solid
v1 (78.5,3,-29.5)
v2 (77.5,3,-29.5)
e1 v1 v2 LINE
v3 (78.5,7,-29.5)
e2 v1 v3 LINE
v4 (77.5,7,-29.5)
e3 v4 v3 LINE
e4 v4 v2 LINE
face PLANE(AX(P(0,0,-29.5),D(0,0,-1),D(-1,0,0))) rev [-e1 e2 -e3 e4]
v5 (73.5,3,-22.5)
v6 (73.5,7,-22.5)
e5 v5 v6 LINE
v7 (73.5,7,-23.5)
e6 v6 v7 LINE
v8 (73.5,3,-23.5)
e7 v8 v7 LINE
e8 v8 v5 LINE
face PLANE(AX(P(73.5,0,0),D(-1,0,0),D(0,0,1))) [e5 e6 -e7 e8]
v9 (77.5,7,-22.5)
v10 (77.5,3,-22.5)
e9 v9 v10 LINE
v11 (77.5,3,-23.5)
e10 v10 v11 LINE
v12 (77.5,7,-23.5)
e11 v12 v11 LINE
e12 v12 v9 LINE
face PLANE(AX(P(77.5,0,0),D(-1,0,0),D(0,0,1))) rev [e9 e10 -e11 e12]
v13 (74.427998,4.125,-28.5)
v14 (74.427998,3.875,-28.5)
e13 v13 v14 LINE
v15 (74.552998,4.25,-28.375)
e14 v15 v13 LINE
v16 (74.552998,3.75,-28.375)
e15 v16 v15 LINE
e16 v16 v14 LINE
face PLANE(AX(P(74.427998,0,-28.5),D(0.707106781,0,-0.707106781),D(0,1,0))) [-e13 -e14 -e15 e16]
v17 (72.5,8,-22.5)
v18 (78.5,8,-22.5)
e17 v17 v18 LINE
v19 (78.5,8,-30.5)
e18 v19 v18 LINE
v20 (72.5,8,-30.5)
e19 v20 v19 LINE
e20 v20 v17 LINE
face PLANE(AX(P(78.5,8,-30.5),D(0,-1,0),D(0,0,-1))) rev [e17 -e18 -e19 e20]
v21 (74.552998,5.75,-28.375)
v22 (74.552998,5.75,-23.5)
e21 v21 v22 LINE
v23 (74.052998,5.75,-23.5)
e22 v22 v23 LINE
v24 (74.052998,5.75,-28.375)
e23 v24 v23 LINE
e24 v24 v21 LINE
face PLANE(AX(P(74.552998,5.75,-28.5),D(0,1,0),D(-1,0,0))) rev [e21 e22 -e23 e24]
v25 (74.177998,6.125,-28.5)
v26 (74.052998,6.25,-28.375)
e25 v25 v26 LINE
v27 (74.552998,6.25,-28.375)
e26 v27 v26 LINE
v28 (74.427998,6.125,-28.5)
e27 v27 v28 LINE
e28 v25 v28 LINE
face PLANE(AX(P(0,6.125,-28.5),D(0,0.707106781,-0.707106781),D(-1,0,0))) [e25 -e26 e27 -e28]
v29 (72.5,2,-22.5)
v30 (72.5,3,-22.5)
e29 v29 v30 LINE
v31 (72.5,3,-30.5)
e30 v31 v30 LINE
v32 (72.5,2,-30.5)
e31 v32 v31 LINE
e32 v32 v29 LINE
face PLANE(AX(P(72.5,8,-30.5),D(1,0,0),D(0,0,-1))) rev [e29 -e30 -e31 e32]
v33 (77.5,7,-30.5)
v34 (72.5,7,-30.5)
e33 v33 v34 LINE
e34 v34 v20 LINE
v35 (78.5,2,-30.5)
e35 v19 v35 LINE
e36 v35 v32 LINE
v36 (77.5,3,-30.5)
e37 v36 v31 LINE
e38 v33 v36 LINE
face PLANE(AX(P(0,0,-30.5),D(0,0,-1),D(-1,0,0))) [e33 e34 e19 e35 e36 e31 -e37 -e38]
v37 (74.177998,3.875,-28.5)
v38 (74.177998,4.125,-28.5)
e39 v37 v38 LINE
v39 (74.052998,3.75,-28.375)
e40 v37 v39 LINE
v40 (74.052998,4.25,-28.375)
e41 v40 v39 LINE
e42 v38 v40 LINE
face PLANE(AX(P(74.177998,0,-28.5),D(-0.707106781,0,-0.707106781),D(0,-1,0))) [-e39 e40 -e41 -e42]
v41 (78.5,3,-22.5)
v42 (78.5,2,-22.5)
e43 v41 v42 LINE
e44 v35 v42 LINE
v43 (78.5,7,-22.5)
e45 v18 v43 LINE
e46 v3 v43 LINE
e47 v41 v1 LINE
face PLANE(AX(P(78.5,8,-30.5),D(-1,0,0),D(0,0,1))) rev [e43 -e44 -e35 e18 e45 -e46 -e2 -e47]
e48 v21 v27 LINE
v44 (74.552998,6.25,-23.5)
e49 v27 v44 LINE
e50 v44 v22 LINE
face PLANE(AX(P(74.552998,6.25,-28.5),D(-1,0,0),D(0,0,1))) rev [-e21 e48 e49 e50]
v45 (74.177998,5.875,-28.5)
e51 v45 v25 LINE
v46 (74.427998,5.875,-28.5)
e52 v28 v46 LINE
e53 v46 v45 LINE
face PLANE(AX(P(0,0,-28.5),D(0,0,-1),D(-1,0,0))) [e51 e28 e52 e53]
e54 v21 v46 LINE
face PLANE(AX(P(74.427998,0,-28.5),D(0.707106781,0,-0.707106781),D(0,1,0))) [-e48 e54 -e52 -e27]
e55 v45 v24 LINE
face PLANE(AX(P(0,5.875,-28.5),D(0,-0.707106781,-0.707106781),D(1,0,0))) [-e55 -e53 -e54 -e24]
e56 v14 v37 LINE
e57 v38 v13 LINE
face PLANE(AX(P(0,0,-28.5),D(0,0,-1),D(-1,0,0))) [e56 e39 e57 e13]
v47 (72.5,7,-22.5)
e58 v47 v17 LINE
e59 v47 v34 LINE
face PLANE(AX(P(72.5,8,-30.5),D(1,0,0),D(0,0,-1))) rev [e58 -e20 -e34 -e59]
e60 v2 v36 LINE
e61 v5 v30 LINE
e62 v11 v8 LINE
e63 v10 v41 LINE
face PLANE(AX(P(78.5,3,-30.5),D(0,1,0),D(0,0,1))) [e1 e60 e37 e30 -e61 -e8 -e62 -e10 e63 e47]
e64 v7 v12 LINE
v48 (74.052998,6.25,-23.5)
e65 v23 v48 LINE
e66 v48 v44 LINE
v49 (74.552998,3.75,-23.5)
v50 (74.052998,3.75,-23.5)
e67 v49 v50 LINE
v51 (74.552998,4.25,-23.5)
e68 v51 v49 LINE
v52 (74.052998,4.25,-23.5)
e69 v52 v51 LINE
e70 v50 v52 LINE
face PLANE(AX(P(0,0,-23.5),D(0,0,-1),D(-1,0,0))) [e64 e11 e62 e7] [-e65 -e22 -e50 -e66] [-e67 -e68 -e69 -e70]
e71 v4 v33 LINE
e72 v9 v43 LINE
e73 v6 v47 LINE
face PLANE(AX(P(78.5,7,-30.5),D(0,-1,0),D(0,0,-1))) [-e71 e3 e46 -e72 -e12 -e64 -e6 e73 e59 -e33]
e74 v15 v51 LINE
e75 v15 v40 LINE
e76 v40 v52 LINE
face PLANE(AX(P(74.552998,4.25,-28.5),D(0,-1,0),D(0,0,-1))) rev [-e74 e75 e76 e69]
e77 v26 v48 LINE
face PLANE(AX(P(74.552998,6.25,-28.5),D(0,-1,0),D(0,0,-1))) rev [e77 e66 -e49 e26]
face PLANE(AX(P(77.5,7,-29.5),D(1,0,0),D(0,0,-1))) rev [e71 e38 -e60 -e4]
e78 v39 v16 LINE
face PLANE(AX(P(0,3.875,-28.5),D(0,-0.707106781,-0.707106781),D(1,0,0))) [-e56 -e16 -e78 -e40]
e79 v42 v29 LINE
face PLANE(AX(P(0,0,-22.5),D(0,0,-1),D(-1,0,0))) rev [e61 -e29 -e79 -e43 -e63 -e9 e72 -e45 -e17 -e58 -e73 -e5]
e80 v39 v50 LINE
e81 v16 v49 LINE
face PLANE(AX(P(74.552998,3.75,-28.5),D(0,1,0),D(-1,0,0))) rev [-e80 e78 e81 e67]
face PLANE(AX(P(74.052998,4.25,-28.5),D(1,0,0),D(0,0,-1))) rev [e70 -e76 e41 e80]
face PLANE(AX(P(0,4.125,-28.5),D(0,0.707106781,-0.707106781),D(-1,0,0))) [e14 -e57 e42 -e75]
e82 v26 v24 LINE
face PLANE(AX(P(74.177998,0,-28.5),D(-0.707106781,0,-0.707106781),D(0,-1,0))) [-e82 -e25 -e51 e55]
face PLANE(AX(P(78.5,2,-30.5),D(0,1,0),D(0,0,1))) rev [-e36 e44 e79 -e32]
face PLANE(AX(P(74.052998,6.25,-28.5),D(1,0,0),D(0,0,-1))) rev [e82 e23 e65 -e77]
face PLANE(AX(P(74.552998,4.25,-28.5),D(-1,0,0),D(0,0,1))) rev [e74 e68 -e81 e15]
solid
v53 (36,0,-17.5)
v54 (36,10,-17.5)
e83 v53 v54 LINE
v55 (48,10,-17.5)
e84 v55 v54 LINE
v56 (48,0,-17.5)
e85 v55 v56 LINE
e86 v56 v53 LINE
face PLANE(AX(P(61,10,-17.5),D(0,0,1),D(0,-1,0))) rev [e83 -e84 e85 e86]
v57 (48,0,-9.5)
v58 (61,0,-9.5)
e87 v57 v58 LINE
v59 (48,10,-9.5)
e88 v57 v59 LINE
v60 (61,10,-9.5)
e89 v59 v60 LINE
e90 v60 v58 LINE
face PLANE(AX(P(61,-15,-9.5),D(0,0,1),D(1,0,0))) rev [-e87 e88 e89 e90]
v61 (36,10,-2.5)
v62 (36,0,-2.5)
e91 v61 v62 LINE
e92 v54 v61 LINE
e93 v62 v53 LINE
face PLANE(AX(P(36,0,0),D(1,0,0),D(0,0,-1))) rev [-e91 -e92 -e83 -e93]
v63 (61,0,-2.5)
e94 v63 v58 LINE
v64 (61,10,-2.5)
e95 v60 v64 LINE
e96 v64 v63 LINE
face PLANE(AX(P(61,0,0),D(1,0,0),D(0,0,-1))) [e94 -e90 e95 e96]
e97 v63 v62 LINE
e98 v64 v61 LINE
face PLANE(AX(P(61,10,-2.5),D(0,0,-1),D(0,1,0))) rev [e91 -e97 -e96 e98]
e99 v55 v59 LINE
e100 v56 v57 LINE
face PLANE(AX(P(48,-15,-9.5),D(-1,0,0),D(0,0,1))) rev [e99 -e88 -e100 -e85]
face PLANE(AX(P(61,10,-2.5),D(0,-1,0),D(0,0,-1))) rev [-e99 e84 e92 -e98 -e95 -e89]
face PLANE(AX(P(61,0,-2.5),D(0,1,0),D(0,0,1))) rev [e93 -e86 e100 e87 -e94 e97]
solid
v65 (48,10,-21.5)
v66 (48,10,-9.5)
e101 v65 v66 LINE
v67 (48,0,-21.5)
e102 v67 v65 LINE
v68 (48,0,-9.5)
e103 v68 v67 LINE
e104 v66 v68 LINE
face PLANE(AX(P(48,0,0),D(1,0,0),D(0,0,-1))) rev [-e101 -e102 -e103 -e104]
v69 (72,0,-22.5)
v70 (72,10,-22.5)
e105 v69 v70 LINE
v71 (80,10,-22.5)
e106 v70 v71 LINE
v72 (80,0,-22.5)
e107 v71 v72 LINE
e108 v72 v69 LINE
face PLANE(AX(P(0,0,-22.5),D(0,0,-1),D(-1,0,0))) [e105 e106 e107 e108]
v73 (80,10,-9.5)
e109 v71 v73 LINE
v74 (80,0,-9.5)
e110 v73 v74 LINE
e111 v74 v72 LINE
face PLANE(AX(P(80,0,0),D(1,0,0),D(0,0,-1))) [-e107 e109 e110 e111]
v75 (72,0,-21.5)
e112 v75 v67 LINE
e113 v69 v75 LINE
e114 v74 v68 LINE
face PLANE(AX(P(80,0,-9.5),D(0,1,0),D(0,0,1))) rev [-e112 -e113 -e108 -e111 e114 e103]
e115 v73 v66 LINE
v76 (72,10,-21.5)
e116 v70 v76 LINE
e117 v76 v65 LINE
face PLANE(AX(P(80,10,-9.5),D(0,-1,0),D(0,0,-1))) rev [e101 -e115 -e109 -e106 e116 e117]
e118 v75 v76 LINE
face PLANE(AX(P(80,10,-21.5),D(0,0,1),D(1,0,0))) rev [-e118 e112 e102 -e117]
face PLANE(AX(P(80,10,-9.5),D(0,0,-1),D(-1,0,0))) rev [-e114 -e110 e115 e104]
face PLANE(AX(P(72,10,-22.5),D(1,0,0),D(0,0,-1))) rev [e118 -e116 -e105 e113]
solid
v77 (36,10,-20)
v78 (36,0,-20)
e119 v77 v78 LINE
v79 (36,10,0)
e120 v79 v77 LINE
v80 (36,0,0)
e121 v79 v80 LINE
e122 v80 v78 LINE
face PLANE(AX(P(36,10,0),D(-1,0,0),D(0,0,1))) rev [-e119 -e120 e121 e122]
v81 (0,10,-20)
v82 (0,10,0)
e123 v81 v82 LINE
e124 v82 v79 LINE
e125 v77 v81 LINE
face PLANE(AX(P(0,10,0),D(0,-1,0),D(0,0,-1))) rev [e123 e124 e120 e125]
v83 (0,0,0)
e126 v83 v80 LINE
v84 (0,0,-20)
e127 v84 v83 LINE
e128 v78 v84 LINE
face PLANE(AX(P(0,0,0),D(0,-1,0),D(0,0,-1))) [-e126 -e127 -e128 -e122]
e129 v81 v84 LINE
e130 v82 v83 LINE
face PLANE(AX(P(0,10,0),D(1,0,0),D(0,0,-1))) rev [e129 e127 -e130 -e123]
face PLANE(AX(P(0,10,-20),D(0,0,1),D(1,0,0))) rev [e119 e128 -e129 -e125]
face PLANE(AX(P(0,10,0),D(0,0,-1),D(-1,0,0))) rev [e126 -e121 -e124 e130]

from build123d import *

# Parameters (mm, degrees)
SKETCH1_W           = 36
SKETCH1_H           = 20
BOSS_EXTRUDE1_DEPTH = 10
SKETCH2_W           = 15
SKETCH2_H           = 10
BOSS_EXTRUDE2_DEPTH = 25
SKETCH3_W           = 13
SKETCH3_H           = 13.907546289
CUT_EXTRUDE1_DEPTH  = 25
SKETCH4_W           = 12
SKETCH4_H           = 10
BOSS_EXTRUDE3_DEPTH = 32
SKETCH5_W           = 8
SKETCH5_H           = 10
BOSS_EXTRUDE4_DEPTH = 1
SKETCH6_W           = 6
SKETCH6_H           = 6
BOSS_EXTRUDE5_DEPTH = 8
SHELL2_START        = 73.5
SHELL2_OUTLINE_W    = 4
SHELL2_OUTLINE_H    = 6
SHELL2_DEPTH        = 4
SKETCH7_W           = 7
SKETCH7_H           = 4
CUT_EXTRUDE2_DEPTH  = 1
SKETCH8_W           = 8
SKETCH8_H           = 4
CUT_EXTRUDE3_DEPTH  = 1
SKETCH9_W           = 4
SKETCH9_H           = 4
CUT_EXTRUDE4_DEPTH  = 1
SKETCH10_W          = 0.5
SKETCH10_H          = 0.5
BOSS_EXTRUDE6_DEPTH = 5
CHAMFER1_SIZE       = 0.125


# Read off the part's stored shape, not the designer's step: Shell2
with BuildPart() as part:
    # Sketch1 → Boss-Extrude1 (new body)
    with BuildSketch(Plane(origin=(0, 0, 0), x_dir=(1, 0, 0), z_dir=(0, 1, 0))):
        with Locations((18, 10)):
            Rectangle(SKETCH1_W, SKETCH1_H)
    extrude(amount=BOSS_EXTRUDE1_DEPTH)


with BuildPart() as body_2:
    # Sketch2 → Boss-Extrude2 (new body)
    with BuildSketch(Plane(origin=(36, 0, 0), x_dir=(0, 0, -1), z_dir=(1, 0, 0))):
        with Locations((10, 5)):
            Rectangle(SKETCH2_W, SKETCH2_H)
    extrude(amount=BOSS_EXTRUDE2_DEPTH)

    # Sketch3 → Cut-Extrude1 (cut)
    with BuildSketch(Plane(origin=(0, 10, 0), x_dir=(1, 0, 0), z_dir=(0, 1, 0))):
        with Locations((54.5, 16.453773145)):
            Rectangle(SKETCH3_W, SKETCH3_H)
    extrude(amount=-CUT_EXTRUDE1_DEPTH, mode=Mode.SUBTRACT)


with BuildPart() as body_3:
    # Sketch4 → Boss-Extrude3 (new body)
    with BuildSketch(Plane(origin=(48, 0, 0), x_dir=(0, 0, -1), z_dir=(1, 0, 0))):
        with Locations((15.5, 5)):
            Rectangle(SKETCH4_W, SKETCH4_H)
    extrude(amount=BOSS_EXTRUDE3_DEPTH)

    # Sketch5 → Boss-Extrude4 (add)
    with BuildSketch(Plane(origin=(0, 0, -21.5), x_dir=(-1, 0, 0), z_dir=(0, 0, -1))):
        with Locations((-76, 5)):
            Rectangle(SKETCH5_W, SKETCH5_H)
    extrude(amount=BOSS_EXTRUDE4_DEPTH)


with BuildPart() as body_4:
    # Sketch6 → Boss-Extrude5 (new body)
    with BuildSketch(Plane(origin=(0, 0, -22.5), x_dir=(-1, 0, 0), z_dir=(0, 0, -1))):
        with Locations((-75.5, 5)):
            Rectangle(SKETCH6_W, SKETCH6_H)
    extrude(amount=BOSS_EXTRUDE5_DEPTH)

    # Shell2 outline → Shell2 (cut)
    with BuildSketch(Plane.YZ.offset(SHELL2_START)):
        with Locations((5, -26.5)):
            Rectangle(SHELL2_OUTLINE_W, SHELL2_OUTLINE_H)
    extrude(amount=SHELL2_DEPTH, mode=Mode.SUBTRACT)

    # Sketch7 → Cut-Extrude2 (cut)
    with BuildSketch(Plane(origin=(78.5, 0, 0), x_dir=(0, 0, -1), z_dir=(1, 0, 0))):
        with Locations((26, 5)):
            Rectangle(SKETCH7_W, SKETCH7_H)
    extrude(amount=-CUT_EXTRUDE2_DEPTH, mode=Mode.SUBTRACT)

    # Sketch8 → Cut-Extrude3 (cut)
    with BuildSketch(Plane.ZY.offset(-72.5)):
        with Locations((-26.5, 5)):
            Rectangle(SKETCH8_W, SKETCH8_H)
    extrude(amount=-CUT_EXTRUDE3_DEPTH, mode=Mode.SUBTRACT)

    # Sketch9 → Cut-Extrude4 (cut)
    with BuildSketch(Plane(origin=(0, 0, -30.5), x_dir=(-1, 0, 0), z_dir=(0, 0, -1))):
        with Locations((-75.5, 5)):
            Rectangle(SKETCH9_W, SKETCH9_H)
    extrude(amount=-CUT_EXTRUDE4_DEPTH, mode=Mode.SUBTRACT)

    # Sketch10 → Boss-Extrude6 (add)
    with BuildSketch(Plane(origin=(0, 0, -23.5), x_dir=(-1, 0, 0), z_dir=(0, 0, -1))):
        with Locations((-74.302997824, 6)):
            Rectangle(SKETCH10_W, SKETCH10_H)
        with Locations((-74.302997824, 4)):
            Rectangle(SKETCH10_W, SKETCH10_H)
    extrude(amount=BOSS_EXTRUDE6_DEPTH)

    # Chamfer1
    chamfer1_edges = [body_4.edges().sort_by_distance(p)[0] for p in [
        (74.552997824, 6, -28.5),
        (74.302997824, 5.75, -28.5),
        (74.052997824, 6, -28.5),
        (74.302997824, 6.25, -28.5),
        (74.552997824, 4, -28.5),
        (74.302997824, 3.75, -28.5),
        (74.052997824, 4, -28.5),
        (74.302997824, 4.25, -28.5),
    ]]
    chamfer(chamfer1_edges, length=CHAMFER1_SIZE)


solid = Compound([part.part, body_2.part, body_3.part, body_4.part])
